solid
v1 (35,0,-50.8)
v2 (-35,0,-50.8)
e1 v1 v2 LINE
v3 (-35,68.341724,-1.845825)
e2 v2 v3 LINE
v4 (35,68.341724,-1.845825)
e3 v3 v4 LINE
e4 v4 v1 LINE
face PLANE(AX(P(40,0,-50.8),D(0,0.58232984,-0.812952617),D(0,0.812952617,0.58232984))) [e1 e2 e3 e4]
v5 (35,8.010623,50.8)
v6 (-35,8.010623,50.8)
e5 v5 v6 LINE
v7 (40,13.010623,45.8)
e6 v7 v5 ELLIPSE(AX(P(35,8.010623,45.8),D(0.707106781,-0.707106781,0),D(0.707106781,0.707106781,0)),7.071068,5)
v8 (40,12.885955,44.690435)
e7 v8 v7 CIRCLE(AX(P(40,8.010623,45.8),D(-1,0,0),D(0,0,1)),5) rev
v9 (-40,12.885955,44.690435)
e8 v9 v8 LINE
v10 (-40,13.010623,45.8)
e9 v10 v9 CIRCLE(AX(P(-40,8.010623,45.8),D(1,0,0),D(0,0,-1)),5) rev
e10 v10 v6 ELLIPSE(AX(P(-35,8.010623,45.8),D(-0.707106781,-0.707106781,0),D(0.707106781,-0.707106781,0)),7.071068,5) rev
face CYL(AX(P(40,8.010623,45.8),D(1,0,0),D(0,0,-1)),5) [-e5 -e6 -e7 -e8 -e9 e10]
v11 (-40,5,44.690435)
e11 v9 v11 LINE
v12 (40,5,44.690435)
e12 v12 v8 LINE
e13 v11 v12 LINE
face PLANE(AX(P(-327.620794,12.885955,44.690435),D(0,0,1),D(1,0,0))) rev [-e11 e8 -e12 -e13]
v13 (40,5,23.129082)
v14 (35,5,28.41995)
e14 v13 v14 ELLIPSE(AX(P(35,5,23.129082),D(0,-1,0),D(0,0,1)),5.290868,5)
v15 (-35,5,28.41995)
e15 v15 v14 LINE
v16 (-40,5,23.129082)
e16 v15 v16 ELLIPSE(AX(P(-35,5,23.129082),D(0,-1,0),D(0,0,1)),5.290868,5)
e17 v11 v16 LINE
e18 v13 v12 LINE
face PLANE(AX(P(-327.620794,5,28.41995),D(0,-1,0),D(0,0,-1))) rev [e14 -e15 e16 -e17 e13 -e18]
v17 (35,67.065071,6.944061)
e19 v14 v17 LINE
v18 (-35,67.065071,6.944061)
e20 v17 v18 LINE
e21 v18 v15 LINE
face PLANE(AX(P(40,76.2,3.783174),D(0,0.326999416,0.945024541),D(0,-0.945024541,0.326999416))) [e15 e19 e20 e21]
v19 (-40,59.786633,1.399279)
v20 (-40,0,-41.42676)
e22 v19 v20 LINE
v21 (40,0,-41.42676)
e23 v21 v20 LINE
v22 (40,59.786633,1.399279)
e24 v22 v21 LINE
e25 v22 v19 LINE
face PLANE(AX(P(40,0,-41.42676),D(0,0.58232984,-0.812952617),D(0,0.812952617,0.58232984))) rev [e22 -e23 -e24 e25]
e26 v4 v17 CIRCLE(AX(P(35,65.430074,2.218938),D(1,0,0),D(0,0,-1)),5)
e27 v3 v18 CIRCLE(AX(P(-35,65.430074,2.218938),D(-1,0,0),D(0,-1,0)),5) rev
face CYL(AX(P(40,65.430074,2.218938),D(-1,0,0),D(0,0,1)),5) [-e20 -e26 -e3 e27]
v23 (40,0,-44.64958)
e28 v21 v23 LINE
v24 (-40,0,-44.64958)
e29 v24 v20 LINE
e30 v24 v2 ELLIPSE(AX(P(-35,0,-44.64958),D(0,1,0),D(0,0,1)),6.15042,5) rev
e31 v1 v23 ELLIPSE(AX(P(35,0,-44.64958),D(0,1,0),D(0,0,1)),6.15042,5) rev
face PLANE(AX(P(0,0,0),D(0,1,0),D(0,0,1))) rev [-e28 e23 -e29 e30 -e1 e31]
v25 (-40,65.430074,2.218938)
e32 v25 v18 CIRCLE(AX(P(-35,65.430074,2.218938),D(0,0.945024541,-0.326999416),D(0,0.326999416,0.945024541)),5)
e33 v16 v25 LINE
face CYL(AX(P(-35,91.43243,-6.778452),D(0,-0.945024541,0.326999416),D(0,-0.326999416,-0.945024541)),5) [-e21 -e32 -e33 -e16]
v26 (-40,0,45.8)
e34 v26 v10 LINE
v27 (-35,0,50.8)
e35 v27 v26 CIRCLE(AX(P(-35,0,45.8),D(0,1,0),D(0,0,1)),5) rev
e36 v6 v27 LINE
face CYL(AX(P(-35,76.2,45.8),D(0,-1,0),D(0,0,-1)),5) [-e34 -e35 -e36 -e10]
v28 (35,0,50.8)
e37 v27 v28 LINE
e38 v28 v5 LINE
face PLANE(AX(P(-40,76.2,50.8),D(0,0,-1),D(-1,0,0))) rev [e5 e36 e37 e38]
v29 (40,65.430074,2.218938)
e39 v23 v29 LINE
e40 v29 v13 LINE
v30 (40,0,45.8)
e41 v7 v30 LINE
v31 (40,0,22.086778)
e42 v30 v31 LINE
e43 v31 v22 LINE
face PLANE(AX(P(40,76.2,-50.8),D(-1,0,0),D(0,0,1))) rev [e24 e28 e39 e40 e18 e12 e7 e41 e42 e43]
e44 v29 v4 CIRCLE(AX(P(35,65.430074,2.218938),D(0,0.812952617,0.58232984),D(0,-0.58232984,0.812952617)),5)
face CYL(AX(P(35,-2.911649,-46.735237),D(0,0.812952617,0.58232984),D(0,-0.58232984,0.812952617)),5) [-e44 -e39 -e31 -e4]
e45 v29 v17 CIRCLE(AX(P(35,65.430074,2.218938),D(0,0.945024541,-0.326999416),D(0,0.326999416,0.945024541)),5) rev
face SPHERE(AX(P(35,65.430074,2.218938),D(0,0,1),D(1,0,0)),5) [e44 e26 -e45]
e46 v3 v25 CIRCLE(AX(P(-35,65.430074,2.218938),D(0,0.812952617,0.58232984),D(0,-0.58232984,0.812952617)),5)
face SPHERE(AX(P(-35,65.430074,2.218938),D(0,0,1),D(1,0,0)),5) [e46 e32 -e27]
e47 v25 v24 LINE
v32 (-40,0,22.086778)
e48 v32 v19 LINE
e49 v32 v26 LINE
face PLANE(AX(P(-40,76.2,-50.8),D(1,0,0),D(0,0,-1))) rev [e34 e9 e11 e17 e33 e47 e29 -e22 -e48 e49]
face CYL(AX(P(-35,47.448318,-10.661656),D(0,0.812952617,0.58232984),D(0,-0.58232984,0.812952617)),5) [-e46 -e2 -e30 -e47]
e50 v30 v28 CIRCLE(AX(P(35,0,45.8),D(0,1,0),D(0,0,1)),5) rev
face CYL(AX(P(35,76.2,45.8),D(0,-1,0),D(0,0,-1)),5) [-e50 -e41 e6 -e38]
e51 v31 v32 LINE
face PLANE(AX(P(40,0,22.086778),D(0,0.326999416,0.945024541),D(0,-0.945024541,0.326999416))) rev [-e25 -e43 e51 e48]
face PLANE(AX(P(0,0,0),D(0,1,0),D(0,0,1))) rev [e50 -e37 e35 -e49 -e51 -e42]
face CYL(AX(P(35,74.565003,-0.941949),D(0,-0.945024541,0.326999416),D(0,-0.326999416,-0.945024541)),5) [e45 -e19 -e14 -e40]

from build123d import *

# Parameters (mm, degrees)
BASE_W                  = 80
BASE_H                  = 101.6
BOSS_EXTRUDE1_DEPTH     = 76.2
SKETCH2_OUTSIDE_W       = 133.62
SKETCH2_OUTSIDE_H       = 108.22
CUT_EXTRUDE1_DEPTH      = 122.602138139
CUT_EXTRUDE2_DEPTH      = 122.602138139
CUT_EXTRUDE5_DEPTH      = 122.602138139
CUT_EXTRUDE5_DEPTH_BACK = 122.602138139
FILLET9_R               = 5


with BuildPart() as part:
    # Base → Boss-Extrude1 (new body)
    with BuildSketch(Plane(origin=(0, 0, 0), x_dir=(1, 0, 0), z_dir=(0, 1, 0))):
        Rectangle(BASE_W, BASE_H)
    extrude(amount=BOSS_EXTRUDE1_DEPTH)

    # Sketch2 outside → Cut-Extrude1 (cut, through all)
    with BuildSketch(Plane.ZY.offset(40)):
        with Locations((0, 38.1)):
            Rectangle(SKETCH2_OUTSIDE_W, SKETCH2_OUTSIDE_H)
        Polygon((-50.8, 0), (3.783173521, 76.2), (27.722793107, 7.014775443), (50.8, 15), (50.8, 0), align=None, mode=Mode.SUBTRACT)
    extrude(amount=-CUT_EXTRUDE1_DEPTH, mode=Mode.SUBTRACT)

    # Sketch3 → Cut-Extrude2 (cut, through all)
    with BuildSketch(Plane.ZY.offset(40)):
        Polygon((-41.426759988, 0), (22.086778061, 0), (1.39927914, 59.786633335), align=None)
    extrude(amount=-CUT_EXTRUDE2_DEPTH, mode=Mode.SUBTRACT)

    # Sketch4 → Cut-Extrude5 (cut, two sides: drawn at the far end of the back side and taken through both)
    with BuildSketch(Plane.ZY.offset(40).offset(-CUT_EXTRUDE5_DEPTH_BACK)):
        Polygon((-50.478149223, 233.014597048), (27.722793107, 7.014775443), (28.419950021, 5), (44.690435309, 5), (44.690435309, 12.88595534), (44.690435309, 252.032995353), (-49.038158805, 721.053440145), (-144.206743336, 702.035041841), align=None)
    extrude(amount=CUT_EXTRUDE5_DEPTH + CUT_EXTRUDE5_DEPTH_BACK, mode=Mode.SUBTRACT)

    # Fillet9
    # the kernel refuses this fillet: 5 mm, written as the material it takes off along each edge
    with BuildSketch(Plane(origin=(35, 65.430074367, 2.218938363), x_dir=(0, 0.3269994156125086, 0.9450245405221379), z_dir=(1, 0, 0))) as fillet9_piece_1_section:
        Polygon((0, 0), (FILLET9_R * 1.02, 0), (FILLET9_R * 1.02, -FILLET9_R * 1.97193336822), (-FILLET9_R * 0.58939542952, -FILLET9_R * 0.832474040232), align=None)
    fillet9_piece_1 = extrude(amount=FILLET9_R * 1.02, mode=Mode.PRIVATE)
    fillet9_piece_1 = fillet9_piece_1 - Plane(origin=(35, 65.430074367, 2.218938363), x_dir=(0, -0.9896165143253448, -0.14373292794121578), z_dir=(1, 0, 0)) * Sphere(FILLET9_R, mode=Mode.PRIVATE)
    add(fillet9_piece_1, mode=Mode.SUBTRACT)
    with BuildSketch(Plane(origin=(-35, 65.430074367, 2.218938363), x_dir=(0, 0.5823298395581055, -0.8129526172909656), z_dir=(-1, 0, 0))) as fillet9_piece_2_section:
        Polygon((0, 0), (FILLET9_R * 1.02, 0), (FILLET9_R * 1.02, -FILLET9_R * 1.97193336822), (-FILLET9_R * 0.58939542952, -FILLET9_R * 0.832474040232), align=None)
    fillet9_piece_2 = extrude(amount=FILLET9_R * 1.02, mode=Mode.PRIVATE)
    fillet9_piece_2 = fillet9_piece_2 - Plane(origin=(-35, 65.430074367, 2.218938363), x_dir=(0, -0.9896165143253448, -0.14373292794121578), z_dir=(-1, 0, 0)) * Sphere(FILLET9_R, mode=Mode.PRIVATE)
    add(fillet9_piece_2, mode=Mode.SUBTRACT)
    with BuildSketch(Plane(origin=(40, 67.065071445, 6.944061066), x_dir=(-1, 0, 0), z_dir=(0, -0.9450245405221379, 0.32699941561250884))) as fillet9_piece_3_section:
        with BuildLine():
            CenterArc((FILLET9_R, FILLET9_R), FILLET9_R, 180, 90)
            Line((0, FILLET9_R), (0, 0))
            Line((0, 0), (FILLET9_R, 0))
        make_face()
    fillet9_piece_3 = extrude(amount=78.175618763, mode=Mode.PRIVATE)
    fillet9_piece_3 = split(fillet9_piece_3, bisect_by=Plane(origin=(40, 5, 6.944061066), z_dir=(0, 1, 0)), keep=Keep.TOP, mode=Mode.PRIVATE)
    add(fillet9_piece_3, mode=Mode.SUBTRACT)
    with BuildSketch(Plane(origin=(40, -12.5, 50.8), x_dir=(-1, 0, 0), z_dir=(0, 1, 0))) as fillet9_piece_4:
        with BuildLine():
            CenterArc((FILLET9_R, -FILLET9_R), FILLET9_R, 90, 90)
            Line((0, -FILLET9_R), (0, 0))
            Line((0, 0), (FILLET9_R, 0))
        make_face()
    extrude(amount=40, mode=Mode.SUBTRACT)
    with BuildSketch(Plane(origin=(-57.473442698, 15, 50.8), x_dir=(0, -0.32699941561252693, -0.9450245405221316), z_dir=(1, 0, 0))) as fillet9_piece_5:
        with BuildLine():
            CenterArc((7.010644923, -4.970135785), FILLET9_R, 96.265339119, 102.821413949)
            Line((2.28552222, -6.605132863), (0, 0))
            Line((0, 0), (6.464979934, 0))
        make_face()
    extrude(amount=114.946885396, mode=Mode.SUBTRACT)
    with BuildSketch(Plane(origin=(-40, -12.5, 50.8), x_dir=(1, 0, 0), z_dir=(0, 1, 0))) as fillet9_piece_6:
        with BuildLine():
            CenterArc((FILLET9_R, FILLET9_R), FILLET9_R, 180, 90)
            Line((0, FILLET9_R), (0, 0))
            Line((0, 0), (FILLET9_R, 0))
        make_face()
    extrude(amount=40, mode=Mode.SUBTRACT)
    with BuildSketch(Plane(origin=(-40, -6.812806757, 32.507442716), x_dir=(1, 0, 0), z_dir=(0, 0.9450245405221379, -0.32699941561250884))) as fillet9_piece_7_section:
        with BuildLine():
            CenterArc((FILLET9_R, FILLET9_R), FILLET9_R, 180, 90)
            Line((0, FILLET9_R), (0, 0))
            Line((0, 0), (FILLET9_R, 0))
        make_face()
    fillet9_piece_7 = extrude(amount=78.175618763, mode=Mode.PRIVATE)
    fillet9_piece_7 = split(fillet9_piece_7, bisect_by=Plane(origin=(-40, 5, 32.507442716), z_dir=(0, 1, 0)), keep=Keep.TOP, mode=Mode.PRIVATE)
    add(fillet9_piece_7, mode=Mode.SUBTRACT)
    with BuildSketch(Plane(origin=(-40, -10.161907716, -58.079122994), x_dir=(1, 0, 0), z_dir=(0, 0.8129526172909656, 0.5823298395581055)), Plane(origin=(40, 68.341723565, -1.845824723), x_dir=(-1, 0, 0), z_dir=(0, -0.8129526172909656, -0.5823298395581055))) as fillet9_piece_8:
        with BuildLine():
            CenterArc((FILLET9_R, -FILLET9_R), FILLET9_R, 90, 90)
            Line((0, -FILLET9_R), (0, 0))
            Line((0, 0), (FILLET9_R, 0))
        make_face()
    extrude(amount=96.566060077, mode=Mode.SUBTRACT)
    with BuildSketch(Plane(origin=(-35, 76.2, 3.783173521), x_dir=(0, -0.8129526172909656, -0.5823298395581056), z_dir=(1, 0, 0))) as fillet9_piece_9:
        with BuildLine():
            CenterArc((FILLET9_R * 1.93326800806, -FILLET9_R), FILLET9_R, 90, 125.29866839)
            Line((FILLET9_R * 1.11711698822, -FILLET9_R * 1.57783865639), (0, 0))
            Line((0, 0), (FILLET9_R * 1.93326800806, 0))
        make_face()
    extrude(amount=70, mode=Mode.SUBTRACT)


solid = part.part
